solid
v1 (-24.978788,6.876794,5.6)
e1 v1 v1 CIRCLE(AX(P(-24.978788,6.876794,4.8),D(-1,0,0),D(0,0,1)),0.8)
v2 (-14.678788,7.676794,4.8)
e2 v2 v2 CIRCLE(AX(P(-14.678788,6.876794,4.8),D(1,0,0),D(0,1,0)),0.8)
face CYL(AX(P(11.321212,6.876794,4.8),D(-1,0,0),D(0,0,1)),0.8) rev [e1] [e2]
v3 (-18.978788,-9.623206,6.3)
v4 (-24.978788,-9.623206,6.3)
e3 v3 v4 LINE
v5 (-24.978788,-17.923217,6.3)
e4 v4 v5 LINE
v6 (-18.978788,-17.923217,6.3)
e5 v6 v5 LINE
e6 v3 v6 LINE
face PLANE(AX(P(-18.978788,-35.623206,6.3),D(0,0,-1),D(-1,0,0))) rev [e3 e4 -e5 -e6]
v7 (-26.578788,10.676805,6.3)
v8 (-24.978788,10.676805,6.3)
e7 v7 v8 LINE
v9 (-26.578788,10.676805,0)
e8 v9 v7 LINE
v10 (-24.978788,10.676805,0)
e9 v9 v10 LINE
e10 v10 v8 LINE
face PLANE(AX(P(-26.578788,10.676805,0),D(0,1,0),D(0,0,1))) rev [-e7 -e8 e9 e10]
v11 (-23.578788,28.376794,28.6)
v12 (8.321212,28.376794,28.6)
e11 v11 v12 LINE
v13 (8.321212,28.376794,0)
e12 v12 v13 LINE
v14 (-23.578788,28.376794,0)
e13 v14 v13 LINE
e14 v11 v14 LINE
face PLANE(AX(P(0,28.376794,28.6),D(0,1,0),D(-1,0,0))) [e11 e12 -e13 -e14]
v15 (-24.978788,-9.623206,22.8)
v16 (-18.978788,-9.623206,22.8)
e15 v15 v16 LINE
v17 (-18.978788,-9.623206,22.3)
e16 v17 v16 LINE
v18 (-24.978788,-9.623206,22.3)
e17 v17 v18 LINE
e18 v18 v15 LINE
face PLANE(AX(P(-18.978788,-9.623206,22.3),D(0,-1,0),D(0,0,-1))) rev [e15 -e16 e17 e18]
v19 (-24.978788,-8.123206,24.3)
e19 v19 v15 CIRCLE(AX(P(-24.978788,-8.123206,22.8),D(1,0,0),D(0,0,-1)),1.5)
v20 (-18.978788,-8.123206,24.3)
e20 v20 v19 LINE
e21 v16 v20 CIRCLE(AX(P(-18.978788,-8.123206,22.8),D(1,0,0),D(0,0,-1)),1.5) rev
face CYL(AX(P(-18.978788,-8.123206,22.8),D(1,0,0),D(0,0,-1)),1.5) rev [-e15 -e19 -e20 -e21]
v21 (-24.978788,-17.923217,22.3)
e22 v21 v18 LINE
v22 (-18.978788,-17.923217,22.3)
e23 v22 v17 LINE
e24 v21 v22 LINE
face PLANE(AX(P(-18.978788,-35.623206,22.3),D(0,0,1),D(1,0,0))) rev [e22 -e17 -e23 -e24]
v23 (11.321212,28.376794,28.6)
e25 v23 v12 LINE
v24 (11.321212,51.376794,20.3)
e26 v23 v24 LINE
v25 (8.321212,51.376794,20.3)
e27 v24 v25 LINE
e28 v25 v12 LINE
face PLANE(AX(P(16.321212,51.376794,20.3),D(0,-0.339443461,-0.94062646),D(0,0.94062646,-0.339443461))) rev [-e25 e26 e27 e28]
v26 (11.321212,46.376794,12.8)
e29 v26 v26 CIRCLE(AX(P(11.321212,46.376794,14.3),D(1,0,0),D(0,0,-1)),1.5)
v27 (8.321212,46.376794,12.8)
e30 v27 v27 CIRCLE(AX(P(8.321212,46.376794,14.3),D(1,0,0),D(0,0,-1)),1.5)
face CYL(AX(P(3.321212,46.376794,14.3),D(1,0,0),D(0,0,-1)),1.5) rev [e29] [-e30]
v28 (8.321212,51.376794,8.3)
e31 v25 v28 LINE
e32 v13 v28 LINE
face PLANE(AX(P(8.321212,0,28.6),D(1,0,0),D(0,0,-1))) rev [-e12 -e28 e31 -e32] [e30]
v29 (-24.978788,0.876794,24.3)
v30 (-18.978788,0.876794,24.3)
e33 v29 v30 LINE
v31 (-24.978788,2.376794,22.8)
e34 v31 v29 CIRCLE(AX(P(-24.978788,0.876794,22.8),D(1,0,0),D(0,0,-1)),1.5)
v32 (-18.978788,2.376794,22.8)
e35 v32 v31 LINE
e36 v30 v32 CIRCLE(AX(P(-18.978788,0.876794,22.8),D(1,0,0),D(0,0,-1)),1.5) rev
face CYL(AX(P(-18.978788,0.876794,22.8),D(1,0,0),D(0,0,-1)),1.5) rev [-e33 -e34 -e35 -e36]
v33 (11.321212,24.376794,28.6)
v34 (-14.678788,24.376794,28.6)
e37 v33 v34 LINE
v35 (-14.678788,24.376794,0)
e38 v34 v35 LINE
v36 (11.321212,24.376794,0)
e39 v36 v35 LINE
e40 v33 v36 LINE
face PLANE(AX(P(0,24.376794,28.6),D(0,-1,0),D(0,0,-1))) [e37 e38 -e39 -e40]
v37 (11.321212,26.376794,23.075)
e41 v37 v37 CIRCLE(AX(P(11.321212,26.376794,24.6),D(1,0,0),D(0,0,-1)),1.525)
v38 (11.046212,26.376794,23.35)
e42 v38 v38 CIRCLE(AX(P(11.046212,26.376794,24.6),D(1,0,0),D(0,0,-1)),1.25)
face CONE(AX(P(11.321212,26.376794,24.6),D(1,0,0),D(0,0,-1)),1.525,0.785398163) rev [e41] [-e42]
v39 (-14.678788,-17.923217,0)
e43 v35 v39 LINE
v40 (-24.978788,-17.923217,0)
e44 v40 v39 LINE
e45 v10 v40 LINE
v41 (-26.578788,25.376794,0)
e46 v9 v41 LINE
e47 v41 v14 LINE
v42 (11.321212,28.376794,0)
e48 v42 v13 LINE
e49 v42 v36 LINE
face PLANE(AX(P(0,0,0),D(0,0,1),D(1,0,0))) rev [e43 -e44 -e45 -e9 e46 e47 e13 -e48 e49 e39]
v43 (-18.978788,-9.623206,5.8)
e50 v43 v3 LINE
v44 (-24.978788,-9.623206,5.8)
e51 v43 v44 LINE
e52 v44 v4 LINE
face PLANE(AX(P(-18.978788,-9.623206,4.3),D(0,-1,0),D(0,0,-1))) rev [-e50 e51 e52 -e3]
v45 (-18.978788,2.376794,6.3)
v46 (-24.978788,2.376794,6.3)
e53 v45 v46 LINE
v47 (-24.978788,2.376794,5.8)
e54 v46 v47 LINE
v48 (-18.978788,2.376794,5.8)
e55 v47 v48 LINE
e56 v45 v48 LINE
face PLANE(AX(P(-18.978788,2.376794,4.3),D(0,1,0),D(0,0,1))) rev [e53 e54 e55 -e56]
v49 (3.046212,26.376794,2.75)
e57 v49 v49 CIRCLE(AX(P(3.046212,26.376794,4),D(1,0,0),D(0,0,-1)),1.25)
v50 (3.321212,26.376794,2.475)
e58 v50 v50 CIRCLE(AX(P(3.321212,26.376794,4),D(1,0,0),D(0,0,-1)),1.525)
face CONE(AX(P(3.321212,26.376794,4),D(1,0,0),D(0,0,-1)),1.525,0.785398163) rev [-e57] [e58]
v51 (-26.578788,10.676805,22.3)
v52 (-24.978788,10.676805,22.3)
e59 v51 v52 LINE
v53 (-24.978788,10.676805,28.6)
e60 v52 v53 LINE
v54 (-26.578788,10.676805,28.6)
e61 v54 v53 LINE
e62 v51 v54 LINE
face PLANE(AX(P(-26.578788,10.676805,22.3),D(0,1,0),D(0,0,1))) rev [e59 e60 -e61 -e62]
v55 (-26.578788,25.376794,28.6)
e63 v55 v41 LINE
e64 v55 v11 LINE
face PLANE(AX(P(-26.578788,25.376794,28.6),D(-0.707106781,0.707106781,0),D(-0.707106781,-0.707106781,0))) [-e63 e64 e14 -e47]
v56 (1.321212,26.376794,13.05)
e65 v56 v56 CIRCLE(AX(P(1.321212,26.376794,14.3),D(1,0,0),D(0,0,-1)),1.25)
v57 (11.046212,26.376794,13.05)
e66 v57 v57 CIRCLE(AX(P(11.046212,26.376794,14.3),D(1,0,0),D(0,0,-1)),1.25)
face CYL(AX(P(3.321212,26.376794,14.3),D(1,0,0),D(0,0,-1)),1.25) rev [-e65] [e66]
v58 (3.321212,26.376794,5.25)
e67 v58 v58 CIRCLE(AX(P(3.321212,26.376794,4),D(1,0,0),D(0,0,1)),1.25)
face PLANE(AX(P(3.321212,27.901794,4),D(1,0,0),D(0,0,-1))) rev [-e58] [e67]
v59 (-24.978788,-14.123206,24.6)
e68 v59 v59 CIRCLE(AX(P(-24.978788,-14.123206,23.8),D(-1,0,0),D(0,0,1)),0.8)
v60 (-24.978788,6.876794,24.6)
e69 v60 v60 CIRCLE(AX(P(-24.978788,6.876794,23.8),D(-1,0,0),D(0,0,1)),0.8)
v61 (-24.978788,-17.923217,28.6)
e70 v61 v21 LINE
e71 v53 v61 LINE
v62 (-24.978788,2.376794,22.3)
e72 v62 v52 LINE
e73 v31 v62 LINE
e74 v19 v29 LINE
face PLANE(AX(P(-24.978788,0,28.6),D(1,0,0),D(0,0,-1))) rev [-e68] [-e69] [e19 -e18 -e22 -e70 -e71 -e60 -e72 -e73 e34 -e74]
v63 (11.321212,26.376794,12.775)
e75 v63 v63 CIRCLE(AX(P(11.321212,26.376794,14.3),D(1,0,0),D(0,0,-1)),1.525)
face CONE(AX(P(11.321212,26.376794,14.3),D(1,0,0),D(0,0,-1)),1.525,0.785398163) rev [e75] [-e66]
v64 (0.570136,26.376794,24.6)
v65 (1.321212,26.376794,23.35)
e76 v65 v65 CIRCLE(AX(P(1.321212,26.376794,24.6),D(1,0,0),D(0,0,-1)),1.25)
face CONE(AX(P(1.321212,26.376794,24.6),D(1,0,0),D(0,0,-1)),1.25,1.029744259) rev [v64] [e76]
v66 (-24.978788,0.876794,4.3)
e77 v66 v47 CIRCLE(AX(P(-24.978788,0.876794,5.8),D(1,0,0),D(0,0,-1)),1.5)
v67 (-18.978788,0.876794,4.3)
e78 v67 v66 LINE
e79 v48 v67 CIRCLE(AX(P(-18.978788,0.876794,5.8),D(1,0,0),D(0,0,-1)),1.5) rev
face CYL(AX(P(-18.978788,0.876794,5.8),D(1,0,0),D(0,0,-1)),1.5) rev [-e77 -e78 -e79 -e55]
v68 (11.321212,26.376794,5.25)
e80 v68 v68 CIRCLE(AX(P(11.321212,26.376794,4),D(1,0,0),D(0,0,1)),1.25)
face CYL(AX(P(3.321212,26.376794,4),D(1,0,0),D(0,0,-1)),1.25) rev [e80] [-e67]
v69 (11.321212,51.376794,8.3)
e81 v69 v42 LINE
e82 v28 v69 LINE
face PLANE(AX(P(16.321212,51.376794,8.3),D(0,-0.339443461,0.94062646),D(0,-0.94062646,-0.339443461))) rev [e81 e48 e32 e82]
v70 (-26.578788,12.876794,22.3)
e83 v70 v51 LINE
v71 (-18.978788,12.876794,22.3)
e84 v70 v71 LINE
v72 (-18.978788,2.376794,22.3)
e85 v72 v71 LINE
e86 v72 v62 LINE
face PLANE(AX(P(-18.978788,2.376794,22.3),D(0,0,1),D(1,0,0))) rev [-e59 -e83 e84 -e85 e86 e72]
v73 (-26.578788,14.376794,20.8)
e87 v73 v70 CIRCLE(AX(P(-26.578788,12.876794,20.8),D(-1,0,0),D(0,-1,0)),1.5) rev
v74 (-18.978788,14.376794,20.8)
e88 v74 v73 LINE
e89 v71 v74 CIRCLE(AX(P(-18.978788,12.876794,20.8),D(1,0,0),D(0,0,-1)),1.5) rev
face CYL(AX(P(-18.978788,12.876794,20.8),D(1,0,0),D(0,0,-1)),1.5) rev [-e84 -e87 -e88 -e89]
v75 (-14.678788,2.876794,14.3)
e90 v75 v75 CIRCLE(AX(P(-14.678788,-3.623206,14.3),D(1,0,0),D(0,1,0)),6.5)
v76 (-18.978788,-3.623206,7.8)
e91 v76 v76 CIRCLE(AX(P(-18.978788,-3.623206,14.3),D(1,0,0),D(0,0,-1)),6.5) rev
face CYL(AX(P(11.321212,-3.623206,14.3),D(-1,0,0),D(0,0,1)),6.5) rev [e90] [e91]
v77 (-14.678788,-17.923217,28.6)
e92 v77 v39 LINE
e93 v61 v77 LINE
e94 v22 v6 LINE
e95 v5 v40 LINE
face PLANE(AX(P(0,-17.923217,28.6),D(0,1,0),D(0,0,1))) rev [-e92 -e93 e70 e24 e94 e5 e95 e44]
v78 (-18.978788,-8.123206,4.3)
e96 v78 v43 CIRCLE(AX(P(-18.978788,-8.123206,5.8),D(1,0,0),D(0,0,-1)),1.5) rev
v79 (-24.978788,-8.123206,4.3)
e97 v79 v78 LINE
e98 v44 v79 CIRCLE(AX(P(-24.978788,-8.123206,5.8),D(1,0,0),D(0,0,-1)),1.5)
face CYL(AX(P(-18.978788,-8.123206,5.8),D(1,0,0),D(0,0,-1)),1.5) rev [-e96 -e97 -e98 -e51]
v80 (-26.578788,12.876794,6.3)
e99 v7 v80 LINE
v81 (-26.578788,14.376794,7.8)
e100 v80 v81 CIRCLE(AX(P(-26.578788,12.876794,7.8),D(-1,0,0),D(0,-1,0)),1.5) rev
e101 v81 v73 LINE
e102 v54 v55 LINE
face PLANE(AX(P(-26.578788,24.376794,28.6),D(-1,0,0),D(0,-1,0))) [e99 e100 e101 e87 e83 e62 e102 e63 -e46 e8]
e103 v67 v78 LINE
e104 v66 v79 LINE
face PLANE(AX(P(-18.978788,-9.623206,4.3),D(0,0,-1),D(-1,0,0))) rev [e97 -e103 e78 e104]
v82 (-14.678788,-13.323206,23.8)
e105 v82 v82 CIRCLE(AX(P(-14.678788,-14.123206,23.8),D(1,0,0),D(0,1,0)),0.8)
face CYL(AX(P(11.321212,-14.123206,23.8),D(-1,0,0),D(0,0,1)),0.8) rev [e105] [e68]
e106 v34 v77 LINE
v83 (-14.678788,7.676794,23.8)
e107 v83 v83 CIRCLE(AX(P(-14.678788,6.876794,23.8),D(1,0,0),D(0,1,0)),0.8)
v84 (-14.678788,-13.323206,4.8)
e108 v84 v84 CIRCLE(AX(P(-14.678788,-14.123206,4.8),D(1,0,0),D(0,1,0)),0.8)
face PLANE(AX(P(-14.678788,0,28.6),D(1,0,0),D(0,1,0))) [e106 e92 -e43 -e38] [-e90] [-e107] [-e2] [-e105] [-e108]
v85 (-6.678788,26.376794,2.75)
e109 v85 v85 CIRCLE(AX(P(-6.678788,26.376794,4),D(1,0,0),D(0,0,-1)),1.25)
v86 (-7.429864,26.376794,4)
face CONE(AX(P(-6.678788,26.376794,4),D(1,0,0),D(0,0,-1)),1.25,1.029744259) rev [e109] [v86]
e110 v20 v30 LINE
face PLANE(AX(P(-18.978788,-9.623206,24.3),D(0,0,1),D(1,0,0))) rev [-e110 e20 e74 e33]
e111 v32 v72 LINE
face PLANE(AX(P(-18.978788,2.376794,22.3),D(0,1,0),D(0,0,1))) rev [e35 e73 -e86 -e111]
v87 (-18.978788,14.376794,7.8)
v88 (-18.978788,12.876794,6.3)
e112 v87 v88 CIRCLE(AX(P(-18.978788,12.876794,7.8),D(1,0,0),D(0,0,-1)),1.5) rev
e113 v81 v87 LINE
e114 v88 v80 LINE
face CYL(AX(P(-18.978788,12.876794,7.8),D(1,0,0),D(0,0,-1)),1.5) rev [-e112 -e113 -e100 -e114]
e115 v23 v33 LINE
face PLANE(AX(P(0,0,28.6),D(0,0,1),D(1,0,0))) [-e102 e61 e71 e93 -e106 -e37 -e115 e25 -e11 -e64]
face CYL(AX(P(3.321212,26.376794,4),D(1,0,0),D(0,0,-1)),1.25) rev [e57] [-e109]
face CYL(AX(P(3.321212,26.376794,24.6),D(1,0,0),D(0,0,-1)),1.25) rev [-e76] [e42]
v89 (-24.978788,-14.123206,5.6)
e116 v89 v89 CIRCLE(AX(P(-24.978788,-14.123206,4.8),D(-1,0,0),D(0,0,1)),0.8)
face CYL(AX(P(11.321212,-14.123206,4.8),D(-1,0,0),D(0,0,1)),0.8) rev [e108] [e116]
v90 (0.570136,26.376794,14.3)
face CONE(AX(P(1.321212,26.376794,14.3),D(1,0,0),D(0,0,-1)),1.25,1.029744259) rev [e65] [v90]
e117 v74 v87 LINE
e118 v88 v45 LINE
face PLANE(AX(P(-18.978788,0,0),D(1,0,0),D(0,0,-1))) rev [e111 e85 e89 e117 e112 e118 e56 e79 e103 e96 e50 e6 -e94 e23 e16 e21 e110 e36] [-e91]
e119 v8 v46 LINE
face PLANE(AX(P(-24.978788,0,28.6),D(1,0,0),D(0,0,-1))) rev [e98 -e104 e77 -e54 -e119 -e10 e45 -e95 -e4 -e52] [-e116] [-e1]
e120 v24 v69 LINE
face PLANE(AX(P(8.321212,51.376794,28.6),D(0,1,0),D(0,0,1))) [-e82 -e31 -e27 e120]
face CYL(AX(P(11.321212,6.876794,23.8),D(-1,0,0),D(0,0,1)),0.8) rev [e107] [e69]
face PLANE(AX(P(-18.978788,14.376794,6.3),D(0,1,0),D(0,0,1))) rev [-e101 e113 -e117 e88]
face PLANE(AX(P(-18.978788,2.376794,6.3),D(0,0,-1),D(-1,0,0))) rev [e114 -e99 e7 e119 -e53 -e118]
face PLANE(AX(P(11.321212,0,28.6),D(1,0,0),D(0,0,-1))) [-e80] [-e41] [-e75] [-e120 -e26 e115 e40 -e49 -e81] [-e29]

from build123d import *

# Parameters (mm, degrees)
EXTRUDE_1_DEPTH     = 28.6
SKETCH_1_R          = 6.5
CUT_EXTRUDE_1_DEPTH = 70.103002637
SKETCH_2_R          = 0.8
CUT_EXTRUDE_2_DEPTH = 70.103002637
CUT_EXTRUDE_4_DEPTH = 6
EXTRUDE_2_DEPTH     = 1.6
FILLET_1_R          = 1.5
FILLET_2_R          = 1.5
SKETCH_6_R          = 1.5
SKETCH_6_R_2        = 1.25
CUT_EXTRUDE_7_DEPTH = 8
CUT_EXTRUDE_8_DEPTH = 8


with BuildPart() as part:
    # Model → 凸台-拉伸1 (new body)
    with BuildSketch(Plane.XY):
        Polygon((-24.978787879, -17.92321671), (-14.678787879, -17.92321671), (-14.678787879, 24.376794113), (11.321212121, 24.376794113), (11.321212121, 51.376794114), (8.321212121, 51.376794114), (8.321212121, 28.376794114), (-23.578787879, 28.376794114), (-26.578787879, 25.376794114), (-26.578787879, 24.376794113), (-24.978787879, 24.376794113), align=None)
    extrude(amount=EXTRUDE_1_DEPTH)

    # 草图1 → 切除-拉伸1 (cut, through all)
    with BuildSketch(Plane.ZY.offset(24.978787879)):
        with Locations((14.3, -3.623205886)):
            Circle(SKETCH_1_R)
    extrude(amount=-CUT_EXTRUDE_1_DEPTH, mode=Mode.SUBTRACT)

    # 草图2 → 切除-拉伸2 (cut, through all)
    with BuildSketch(Plane.ZY.offset(24.978787879)):
        with Locations((23.8, 6.876794114)):
            Circle(SKETCH_2_R)
        with Locations((23.8, -14.123205886)):
            Circle(SKETCH_2_R)
        with Locations((4.8, -14.123205886)):
            Circle(SKETCH_2_R)
        with Locations((4.8, 6.876794114)):
            Circle(SKETCH_2_R)
    extrude(amount=-CUT_EXTRUDE_2_DEPTH, mode=Mode.SUBTRACT)

    # 草图3 → 切除-拉伸4 (cut)
    with BuildSketch(Plane.ZY.offset(24.978787879)):
        Polygon((6.3, -35.623205886), (22.3, -35.623205886), (22.3, -9.623205886), (24.3, -9.623205886), (24.3, 2.376794114), (22.3, 2.376794114), (22.3, 14.376794114), (6.3, 14.376794114), (6.3, 2.376794114), (4.3, 2.376794114), (4.3, -9.623205886), (6.3, -9.623205886), align=None)
    extrude(amount=-CUT_EXTRUDE_4_DEPTH, mode=Mode.SUBTRACT)

    # 草图5 → 凸台-拉伸2 (add, through all)
    with BuildSketch(Plane.ZY.offset(24.978787879)):
        Polygon((0, 24.376794113), (28.6, 24.376794113), (28.6, 10.676804938), (22.3, 10.676804938), (22.3, 14.376794114), (6.3, 14.376794114), (6.3, 10.676804938), (0, 10.676804938), align=None)
    extrude(amount=EXTRUDE_2_DEPTH)

    # 圆角1
    fillet_1_edges = [part.edges().sort_by_distance(p)[0] for p in [
        (-21.978787879, -9.623205886, 4.3),
        (-21.978787879, 2.376794114, 4.3),
        (-21.978787879, 2.376794114, 24.3),
        (-21.978787879, -9.623205886, 24.3),
    ]]
    fillet(fillet_1_edges, radius=FILLET_1_R)

    # 圆角2
    fillet_2_edges = [part.edges().sort_by_distance(p)[0] for p in [
        (-22.778787879, 14.376794114, 6.3),
        (-22.778787879, 14.376794114, 22.3),
    ]]
    fillet(fillet_2_edges, radius=FILLET_2_R)

    # 草图6 → 切除-拉伸7 (cut)
    with BuildSketch(Plane(origin=(11.321212121, 0, 0), x_dir=(0, 0, -1), z_dir=(1, 0, 0))):
        with Locations((-14.3, 46.376794114)):
            Circle(SKETCH_6_R)
        with Locations((-14.3, 26.376794113)):
            Circle(SKETCH_6_R_2)
        with Locations((-24.6, 26.376794113)):
            Circle(SKETCH_6_R_2)
        with Locations(Location((-4, 26.376794113, 0), (0, 0, 180))):
            Circle(SKETCH_6_R_2)
    extrude(amount=-CUT_EXTRUDE_7_DEPTH, mode=Mode.SUBTRACT)

    # 草图8 → 切除-拉伸8 (cut)
    with BuildSketch(Plane.ZY.offset(-8.321212121)):
        Polygon((8.3, 51.376794114), (0, 28.376794114), (-7.058670234, 55.306274643), align=None)
        Polygon((28.6, 28.376794114), (35.658670234, 55.306274643), (20.3, 51.376794114), align=None)
    extrude(amount=-CUT_EXTRUDE_8_DEPTH, mode=Mode.SUBTRACT)

    # M3 螺纹孔1: read off the stored shape, not the designer's step
    # M3 螺纹孔1 outline → M3 螺纹孔1 (revolve, cut)
    with BuildSketch(Plane(origin=(0, 26.376794113, 4), x_dir=(0, 1, 0), z_dir=(0, 0, -1))):
        Polygon((0, -7.429863653), (1.25, -6.678787879), (1.25, 3.046212121), (1.525, 3.321212121), (0, 3.321212121), align=None)
    revolve(axis=Axis((0, 26.376794113, 4), (1, 0, 0)), mode=Mode.SUBTRACT)

    # Hole Wizard M3 _1 2 outline → Hole Wizard M3 _1 2 (revolve, cut)
    with BuildSketch(Plane(origin=(0, 26.376794113, 14.3), x_dir=(0, 1, 0), z_dir=(0, 0, -1))):
        Polygon((1.25, 11.321212121), (1.25, 11.046212121), (1.525, 11.321212121), align=None)
        Polygon((1.25, 1.321212121), (1.25, 11.046212121), (0, 11.046212121), (0, 0.570136347), align=None)
    revolve(axis=Axis((0, 26.376794113, 14.3), (1, 0, 0)), mode=Mode.SUBTRACT)

    # Hole Wizard M3 _1 3 outline → Hole Wizard M3 _1 3 (revolve, cut)
    with BuildSketch(Plane(origin=(0, 26.376794113, 24.6), x_dir=(0, 1, 0), z_dir=(0, 0, -1))):
        Polygon((1.25, 11.321212121), (1.25, 11.046212121), (1.525, 11.321212121), align=None)
        Polygon((1.25, 1.321212121), (1.25, 3.321212121), (0, 3.321212121), (0, 0.570136347), align=None)
    revolve(axis=Axis((0, 26.376794113, 24.6), (1, 0, 0)), mode=Mode.SUBTRACT)


solid = part.part
